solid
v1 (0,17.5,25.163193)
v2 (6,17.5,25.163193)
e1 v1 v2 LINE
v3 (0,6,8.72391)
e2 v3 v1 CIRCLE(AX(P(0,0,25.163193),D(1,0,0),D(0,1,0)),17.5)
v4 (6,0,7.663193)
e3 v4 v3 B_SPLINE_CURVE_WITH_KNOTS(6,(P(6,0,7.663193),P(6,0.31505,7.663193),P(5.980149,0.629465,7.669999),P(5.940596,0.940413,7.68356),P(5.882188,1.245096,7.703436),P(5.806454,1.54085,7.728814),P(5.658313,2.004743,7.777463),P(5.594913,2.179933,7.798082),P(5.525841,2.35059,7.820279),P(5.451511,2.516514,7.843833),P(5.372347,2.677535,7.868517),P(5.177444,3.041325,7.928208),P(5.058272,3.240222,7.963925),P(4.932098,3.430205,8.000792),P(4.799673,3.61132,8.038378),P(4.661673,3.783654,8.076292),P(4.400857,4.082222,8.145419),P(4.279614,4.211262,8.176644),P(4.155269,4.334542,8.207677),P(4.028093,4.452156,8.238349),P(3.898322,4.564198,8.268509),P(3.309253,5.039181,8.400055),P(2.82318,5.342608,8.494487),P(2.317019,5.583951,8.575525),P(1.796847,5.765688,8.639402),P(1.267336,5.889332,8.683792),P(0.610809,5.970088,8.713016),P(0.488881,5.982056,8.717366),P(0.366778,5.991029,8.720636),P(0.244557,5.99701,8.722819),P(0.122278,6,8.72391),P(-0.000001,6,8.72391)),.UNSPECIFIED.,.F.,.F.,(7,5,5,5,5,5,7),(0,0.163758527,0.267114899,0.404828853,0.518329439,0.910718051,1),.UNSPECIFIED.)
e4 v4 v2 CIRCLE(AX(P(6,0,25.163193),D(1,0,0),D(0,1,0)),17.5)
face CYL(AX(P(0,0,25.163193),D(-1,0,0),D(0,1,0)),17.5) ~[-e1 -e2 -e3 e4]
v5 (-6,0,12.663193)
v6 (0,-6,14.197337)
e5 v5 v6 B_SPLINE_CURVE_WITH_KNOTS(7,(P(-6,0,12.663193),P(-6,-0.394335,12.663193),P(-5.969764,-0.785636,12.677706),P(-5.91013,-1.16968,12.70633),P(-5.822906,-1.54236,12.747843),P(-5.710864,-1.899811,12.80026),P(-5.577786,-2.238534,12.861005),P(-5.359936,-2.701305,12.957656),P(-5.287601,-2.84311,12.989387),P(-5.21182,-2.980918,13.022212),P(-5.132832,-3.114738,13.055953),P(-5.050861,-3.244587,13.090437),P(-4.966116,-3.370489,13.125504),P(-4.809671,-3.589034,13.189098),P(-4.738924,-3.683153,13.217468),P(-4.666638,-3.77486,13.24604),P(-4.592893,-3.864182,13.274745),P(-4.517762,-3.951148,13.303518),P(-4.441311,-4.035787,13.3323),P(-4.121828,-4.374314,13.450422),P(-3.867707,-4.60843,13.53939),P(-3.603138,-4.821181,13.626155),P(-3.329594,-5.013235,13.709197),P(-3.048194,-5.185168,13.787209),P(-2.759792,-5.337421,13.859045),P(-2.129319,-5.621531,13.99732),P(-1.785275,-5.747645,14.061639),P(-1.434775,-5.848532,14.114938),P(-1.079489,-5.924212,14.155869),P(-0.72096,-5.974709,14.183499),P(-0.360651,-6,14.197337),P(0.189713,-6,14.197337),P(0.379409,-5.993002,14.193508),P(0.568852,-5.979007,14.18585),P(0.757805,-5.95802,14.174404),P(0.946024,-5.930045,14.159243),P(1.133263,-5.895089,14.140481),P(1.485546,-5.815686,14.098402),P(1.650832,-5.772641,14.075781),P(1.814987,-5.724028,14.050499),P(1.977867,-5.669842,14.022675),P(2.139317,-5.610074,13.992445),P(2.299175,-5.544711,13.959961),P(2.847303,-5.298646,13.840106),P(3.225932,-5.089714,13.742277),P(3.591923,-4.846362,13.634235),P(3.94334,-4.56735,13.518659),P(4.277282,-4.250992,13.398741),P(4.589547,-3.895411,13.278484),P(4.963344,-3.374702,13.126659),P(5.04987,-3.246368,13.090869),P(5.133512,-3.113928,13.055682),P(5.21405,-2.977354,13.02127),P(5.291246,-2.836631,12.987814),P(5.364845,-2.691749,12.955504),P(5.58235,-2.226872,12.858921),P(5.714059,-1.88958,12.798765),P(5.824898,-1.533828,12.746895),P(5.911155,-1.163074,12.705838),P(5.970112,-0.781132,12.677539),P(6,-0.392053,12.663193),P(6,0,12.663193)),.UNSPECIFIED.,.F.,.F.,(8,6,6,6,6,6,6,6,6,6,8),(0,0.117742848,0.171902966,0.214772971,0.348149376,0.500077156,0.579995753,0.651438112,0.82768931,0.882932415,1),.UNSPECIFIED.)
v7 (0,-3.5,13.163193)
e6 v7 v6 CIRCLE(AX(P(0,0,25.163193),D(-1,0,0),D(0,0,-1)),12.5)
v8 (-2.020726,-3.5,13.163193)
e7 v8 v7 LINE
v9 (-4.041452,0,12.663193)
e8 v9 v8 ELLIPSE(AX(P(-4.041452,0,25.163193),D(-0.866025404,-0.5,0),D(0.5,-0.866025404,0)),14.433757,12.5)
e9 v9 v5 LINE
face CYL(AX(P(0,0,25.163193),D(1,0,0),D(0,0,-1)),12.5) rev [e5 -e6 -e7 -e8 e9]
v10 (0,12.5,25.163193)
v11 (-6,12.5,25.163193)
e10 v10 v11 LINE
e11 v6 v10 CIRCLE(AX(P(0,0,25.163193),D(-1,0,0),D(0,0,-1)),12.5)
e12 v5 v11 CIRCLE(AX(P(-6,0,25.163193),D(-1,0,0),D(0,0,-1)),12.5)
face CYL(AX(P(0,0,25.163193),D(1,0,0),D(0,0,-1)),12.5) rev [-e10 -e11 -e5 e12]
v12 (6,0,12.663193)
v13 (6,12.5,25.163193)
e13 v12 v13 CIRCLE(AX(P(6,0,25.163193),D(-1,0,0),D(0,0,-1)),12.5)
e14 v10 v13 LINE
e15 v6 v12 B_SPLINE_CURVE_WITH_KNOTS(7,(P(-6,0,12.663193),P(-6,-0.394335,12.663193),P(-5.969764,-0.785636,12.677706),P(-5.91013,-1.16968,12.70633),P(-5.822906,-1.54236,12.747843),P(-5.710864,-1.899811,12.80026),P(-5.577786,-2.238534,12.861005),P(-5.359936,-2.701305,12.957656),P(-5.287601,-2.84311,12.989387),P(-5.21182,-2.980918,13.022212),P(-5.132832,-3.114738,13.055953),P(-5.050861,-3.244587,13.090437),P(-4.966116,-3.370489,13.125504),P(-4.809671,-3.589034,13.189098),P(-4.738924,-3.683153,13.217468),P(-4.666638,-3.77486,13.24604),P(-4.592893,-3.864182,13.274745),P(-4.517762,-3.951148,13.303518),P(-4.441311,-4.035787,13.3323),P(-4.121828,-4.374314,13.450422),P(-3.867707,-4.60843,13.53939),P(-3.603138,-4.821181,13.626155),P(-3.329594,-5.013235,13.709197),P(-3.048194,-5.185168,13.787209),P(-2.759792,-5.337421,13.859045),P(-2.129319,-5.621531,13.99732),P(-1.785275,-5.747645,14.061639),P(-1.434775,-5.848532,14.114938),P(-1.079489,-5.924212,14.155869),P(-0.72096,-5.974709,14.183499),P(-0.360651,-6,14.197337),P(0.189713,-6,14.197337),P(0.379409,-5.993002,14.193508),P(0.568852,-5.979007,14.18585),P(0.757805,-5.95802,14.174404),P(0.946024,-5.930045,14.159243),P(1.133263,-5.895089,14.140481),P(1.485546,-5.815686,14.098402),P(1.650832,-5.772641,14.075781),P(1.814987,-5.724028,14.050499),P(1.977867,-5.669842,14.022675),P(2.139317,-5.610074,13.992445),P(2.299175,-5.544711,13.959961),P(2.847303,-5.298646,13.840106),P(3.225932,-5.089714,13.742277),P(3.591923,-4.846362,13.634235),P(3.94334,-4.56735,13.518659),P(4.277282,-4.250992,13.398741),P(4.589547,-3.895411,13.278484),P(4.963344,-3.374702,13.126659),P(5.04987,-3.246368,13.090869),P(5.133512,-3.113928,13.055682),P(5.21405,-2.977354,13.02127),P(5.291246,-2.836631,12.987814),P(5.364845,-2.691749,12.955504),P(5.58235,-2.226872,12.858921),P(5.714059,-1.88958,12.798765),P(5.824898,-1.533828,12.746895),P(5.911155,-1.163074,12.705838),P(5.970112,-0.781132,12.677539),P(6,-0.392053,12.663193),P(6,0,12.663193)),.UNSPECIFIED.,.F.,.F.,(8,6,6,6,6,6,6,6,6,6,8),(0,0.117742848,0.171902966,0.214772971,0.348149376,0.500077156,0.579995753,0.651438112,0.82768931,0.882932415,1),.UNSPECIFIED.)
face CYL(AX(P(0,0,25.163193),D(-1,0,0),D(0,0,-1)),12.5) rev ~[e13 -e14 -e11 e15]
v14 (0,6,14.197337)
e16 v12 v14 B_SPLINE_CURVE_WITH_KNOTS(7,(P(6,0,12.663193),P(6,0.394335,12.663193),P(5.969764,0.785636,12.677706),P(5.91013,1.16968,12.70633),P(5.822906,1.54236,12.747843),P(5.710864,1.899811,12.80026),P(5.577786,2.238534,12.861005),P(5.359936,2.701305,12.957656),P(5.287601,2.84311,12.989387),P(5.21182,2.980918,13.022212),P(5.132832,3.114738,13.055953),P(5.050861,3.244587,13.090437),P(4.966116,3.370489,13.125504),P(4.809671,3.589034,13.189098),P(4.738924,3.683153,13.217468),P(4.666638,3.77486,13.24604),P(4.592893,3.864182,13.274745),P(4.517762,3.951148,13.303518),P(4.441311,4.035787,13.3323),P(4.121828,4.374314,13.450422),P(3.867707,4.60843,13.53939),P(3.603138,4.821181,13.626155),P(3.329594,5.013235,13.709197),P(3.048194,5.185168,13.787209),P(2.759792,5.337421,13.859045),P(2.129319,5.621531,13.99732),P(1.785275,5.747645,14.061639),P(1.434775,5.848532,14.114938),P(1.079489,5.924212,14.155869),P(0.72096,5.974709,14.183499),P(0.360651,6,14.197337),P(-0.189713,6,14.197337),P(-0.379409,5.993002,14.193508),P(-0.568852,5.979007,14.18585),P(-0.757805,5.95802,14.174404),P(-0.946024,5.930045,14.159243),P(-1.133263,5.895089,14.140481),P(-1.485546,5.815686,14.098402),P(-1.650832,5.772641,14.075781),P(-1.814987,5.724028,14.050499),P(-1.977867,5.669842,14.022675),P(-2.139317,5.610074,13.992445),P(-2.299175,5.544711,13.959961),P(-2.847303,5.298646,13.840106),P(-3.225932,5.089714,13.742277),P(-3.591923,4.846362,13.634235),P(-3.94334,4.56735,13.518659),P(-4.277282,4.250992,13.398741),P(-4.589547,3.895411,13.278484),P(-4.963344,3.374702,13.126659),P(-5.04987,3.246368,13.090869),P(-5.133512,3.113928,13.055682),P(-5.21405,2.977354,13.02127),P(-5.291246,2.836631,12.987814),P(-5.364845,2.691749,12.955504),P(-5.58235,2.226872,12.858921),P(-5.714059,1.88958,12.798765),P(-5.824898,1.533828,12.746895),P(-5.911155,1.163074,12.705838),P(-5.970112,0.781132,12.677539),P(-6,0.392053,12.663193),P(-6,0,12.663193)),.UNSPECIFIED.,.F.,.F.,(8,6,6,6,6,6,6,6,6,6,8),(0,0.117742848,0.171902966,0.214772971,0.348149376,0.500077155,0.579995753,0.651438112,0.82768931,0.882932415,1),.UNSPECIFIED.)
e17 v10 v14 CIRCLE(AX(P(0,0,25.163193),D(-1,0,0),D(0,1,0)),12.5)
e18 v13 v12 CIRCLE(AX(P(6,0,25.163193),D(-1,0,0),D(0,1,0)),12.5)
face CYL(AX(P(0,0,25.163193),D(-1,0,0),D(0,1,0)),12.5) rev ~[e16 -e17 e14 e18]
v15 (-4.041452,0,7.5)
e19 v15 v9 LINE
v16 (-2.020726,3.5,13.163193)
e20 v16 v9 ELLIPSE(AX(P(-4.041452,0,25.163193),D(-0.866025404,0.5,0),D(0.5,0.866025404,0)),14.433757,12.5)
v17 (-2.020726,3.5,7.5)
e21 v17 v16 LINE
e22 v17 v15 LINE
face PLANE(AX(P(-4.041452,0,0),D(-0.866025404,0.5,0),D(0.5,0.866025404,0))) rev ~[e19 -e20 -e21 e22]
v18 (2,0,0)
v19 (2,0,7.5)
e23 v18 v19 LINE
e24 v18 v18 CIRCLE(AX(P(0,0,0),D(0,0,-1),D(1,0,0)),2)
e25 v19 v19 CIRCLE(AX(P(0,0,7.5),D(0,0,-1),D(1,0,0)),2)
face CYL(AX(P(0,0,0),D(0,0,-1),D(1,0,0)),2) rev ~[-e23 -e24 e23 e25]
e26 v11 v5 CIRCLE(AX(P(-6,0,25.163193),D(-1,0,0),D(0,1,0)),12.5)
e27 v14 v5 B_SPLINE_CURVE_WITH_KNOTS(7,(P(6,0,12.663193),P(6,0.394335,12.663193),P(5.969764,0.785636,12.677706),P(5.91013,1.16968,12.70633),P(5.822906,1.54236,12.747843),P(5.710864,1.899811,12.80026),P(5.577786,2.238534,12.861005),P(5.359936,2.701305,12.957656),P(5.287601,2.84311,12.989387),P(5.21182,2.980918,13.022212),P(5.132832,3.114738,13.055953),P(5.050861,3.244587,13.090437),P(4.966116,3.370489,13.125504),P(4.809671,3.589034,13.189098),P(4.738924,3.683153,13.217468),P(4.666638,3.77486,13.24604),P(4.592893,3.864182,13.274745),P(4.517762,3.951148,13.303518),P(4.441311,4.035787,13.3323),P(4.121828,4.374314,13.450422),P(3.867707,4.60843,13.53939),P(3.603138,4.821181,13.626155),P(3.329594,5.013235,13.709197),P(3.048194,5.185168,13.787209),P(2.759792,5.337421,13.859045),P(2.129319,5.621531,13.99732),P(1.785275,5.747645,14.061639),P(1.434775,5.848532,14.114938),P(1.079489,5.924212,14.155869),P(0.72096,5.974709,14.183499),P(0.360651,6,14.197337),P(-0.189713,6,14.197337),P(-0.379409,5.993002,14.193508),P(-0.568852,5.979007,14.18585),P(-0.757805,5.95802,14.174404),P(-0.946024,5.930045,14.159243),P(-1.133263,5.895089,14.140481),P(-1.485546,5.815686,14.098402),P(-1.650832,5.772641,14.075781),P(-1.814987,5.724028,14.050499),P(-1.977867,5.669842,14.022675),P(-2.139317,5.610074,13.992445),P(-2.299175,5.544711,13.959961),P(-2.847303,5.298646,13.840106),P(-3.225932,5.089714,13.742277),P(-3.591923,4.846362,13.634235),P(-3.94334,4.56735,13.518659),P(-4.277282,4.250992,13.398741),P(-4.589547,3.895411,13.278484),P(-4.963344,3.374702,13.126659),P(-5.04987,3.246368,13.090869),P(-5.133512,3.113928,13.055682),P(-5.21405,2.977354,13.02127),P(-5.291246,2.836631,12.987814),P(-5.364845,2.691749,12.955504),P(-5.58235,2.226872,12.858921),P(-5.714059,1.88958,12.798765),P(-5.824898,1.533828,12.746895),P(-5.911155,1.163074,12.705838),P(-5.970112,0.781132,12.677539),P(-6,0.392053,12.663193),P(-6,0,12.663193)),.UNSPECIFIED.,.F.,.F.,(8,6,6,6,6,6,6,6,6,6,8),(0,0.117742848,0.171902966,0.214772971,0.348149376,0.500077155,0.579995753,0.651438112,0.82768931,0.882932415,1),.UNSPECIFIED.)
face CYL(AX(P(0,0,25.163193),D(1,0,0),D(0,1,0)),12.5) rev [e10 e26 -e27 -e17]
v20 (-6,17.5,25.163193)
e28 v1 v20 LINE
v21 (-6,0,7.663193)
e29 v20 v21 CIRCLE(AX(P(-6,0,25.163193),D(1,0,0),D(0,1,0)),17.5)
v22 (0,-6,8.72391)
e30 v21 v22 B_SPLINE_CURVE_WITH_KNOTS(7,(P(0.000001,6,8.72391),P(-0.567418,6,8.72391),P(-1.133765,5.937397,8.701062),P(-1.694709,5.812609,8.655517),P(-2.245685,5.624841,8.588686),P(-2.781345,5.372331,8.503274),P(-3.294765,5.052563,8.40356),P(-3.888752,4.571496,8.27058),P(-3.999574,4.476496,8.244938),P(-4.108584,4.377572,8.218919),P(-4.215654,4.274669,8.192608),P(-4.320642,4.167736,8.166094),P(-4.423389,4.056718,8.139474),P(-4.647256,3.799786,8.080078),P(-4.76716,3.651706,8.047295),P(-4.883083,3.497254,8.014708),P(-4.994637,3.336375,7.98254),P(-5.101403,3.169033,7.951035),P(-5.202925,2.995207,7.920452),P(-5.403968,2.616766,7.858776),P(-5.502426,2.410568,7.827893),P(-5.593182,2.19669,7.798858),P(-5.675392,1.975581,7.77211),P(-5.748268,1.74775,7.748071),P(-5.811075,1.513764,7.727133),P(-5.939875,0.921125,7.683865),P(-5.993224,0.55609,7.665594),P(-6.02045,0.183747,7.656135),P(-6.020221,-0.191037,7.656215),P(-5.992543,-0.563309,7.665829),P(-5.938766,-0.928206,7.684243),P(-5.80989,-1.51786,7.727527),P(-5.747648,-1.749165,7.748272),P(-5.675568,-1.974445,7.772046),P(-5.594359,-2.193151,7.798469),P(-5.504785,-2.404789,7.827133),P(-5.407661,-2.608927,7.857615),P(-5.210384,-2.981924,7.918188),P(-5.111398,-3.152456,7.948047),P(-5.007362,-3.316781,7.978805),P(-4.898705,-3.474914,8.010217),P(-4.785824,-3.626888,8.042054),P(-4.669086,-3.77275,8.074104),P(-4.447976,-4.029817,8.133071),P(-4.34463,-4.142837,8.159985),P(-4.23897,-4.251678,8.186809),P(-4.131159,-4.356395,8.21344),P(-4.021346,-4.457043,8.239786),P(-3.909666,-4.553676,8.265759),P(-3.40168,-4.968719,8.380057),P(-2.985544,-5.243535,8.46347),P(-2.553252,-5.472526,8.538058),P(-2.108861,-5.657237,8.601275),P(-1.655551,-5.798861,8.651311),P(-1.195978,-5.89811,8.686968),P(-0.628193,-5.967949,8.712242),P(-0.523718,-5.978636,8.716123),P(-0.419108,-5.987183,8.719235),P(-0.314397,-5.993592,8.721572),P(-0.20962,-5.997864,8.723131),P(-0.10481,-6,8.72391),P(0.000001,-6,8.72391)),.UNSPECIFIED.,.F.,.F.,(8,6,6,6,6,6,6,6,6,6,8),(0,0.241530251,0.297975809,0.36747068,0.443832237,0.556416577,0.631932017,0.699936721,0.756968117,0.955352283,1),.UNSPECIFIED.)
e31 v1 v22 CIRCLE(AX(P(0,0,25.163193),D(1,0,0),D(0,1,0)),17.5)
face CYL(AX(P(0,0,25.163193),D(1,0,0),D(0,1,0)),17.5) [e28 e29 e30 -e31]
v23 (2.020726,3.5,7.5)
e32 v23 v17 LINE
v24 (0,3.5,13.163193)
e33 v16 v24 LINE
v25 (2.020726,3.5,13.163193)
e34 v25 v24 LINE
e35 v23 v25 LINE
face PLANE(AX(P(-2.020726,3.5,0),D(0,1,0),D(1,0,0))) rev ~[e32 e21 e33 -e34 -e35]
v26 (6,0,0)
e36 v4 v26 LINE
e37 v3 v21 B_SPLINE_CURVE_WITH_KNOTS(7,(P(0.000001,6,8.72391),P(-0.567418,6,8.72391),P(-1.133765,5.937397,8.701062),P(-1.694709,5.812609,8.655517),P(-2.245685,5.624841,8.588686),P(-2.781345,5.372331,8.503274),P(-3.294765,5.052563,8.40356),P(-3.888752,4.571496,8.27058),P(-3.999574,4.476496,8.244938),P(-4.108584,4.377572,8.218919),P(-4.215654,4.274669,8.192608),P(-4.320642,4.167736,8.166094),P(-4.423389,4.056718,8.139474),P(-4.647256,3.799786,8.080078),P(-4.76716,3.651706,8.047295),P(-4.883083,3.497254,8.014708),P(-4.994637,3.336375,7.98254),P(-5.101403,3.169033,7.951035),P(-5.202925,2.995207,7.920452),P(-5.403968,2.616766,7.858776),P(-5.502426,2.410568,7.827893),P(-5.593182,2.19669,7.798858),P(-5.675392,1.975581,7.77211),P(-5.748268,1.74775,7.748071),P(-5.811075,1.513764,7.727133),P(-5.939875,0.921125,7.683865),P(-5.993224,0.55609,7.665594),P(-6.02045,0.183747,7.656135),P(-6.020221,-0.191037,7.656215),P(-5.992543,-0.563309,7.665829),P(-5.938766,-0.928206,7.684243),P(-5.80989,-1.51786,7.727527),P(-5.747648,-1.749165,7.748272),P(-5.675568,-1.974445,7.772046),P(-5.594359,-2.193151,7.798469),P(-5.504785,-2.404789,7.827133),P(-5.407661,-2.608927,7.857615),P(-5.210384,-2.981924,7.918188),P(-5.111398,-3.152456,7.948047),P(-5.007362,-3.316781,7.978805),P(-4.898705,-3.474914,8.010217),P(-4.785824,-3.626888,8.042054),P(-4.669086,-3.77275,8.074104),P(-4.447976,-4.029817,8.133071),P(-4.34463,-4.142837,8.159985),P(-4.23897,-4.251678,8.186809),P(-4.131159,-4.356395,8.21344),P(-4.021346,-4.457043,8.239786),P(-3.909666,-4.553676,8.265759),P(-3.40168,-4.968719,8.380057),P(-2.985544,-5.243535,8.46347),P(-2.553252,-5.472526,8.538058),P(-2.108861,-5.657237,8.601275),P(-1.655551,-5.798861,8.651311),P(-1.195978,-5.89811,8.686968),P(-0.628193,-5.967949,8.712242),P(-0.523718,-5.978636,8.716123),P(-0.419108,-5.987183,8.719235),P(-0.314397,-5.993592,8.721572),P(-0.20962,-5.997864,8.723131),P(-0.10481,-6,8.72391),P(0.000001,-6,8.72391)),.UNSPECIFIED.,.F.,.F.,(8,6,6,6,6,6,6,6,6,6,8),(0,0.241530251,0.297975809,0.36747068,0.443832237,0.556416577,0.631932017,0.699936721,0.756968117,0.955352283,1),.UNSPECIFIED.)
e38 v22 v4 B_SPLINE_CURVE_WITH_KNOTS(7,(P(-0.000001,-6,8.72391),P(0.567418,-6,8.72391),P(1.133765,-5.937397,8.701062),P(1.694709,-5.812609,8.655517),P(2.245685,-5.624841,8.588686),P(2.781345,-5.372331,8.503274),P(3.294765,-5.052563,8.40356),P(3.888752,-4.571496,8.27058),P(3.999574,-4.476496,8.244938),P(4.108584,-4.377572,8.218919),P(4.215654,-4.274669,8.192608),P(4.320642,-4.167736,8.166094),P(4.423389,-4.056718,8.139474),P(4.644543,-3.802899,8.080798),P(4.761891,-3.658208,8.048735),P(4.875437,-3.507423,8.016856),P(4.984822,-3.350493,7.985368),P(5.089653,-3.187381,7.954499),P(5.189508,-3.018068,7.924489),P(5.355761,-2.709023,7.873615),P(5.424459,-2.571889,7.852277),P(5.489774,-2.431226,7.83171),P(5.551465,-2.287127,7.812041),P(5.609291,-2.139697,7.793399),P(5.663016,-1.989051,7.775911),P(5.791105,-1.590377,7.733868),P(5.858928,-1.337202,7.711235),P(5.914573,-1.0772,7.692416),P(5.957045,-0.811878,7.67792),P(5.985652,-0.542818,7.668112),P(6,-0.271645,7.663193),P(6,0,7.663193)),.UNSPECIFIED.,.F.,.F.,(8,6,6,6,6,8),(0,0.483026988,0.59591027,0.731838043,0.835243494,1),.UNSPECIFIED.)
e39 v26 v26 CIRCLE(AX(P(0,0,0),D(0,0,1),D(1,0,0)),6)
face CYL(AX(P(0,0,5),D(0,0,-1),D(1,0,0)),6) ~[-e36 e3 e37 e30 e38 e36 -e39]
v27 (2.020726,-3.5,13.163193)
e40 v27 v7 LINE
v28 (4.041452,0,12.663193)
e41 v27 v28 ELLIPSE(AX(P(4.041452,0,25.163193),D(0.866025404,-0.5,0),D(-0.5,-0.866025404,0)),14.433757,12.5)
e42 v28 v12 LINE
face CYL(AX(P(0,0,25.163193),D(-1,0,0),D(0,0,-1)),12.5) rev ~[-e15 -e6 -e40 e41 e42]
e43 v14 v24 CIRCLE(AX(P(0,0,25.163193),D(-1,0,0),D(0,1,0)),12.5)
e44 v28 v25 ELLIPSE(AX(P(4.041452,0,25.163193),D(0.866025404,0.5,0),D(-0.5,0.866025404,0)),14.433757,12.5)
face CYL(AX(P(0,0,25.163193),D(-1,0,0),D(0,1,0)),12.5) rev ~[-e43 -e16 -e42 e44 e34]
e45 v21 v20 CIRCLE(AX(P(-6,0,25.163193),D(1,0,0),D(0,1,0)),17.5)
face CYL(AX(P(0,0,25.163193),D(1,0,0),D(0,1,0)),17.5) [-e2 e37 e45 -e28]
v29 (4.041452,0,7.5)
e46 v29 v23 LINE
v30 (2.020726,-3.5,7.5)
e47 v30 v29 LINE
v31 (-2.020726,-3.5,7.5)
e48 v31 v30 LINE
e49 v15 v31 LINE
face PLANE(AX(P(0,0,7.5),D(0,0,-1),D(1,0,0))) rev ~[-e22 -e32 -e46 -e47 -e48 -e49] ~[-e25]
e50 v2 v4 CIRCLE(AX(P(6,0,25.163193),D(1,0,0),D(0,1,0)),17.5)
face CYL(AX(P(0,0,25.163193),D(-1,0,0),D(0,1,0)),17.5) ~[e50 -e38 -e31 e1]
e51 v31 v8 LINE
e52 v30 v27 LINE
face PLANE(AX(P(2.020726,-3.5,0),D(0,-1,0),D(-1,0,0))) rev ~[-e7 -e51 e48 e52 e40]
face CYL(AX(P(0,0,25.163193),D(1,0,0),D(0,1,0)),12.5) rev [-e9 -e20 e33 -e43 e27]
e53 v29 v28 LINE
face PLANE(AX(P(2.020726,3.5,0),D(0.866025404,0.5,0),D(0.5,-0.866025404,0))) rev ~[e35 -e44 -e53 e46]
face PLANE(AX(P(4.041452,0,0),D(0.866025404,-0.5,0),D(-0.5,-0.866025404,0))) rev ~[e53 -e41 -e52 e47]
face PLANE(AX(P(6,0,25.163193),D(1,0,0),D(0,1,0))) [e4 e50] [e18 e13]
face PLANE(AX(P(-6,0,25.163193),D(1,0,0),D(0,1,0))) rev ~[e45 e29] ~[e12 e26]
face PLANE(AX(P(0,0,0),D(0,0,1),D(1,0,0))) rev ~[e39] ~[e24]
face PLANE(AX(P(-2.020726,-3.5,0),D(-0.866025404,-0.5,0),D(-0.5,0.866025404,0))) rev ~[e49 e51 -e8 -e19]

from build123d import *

# Parameters (mm, degrees)
F0_R          = 6
F0_R_2        = 2
F1_DEPTH      = 5
F2_R          = 6
F3_DEPTH      = 5
F4_R          = 17.5
F5_DEPTH      = 6
F5_DEPTH_BACK = 6
F7_END_RADIUS = 12.5
F6_R          = 6
F7_REACH      = 59.6347554857
F9_DEPTH      = 25
F10_R         = 6
F10_R_2       = 2
F11_DEPTH     = 7.5


with BuildPart() as f1:
    # F0 (on Top) → F1 (new body)
    with BuildSketch(Plane.XY):
        Circle(F0_R)
        Polygon((-4.0414518843, 0), (-2.0207259422, 3.5), (2.0207259422, 3.5), (4.0414518843, 0), (2.0207259422, -3.5), (-2.0207259422, -3.5), align=None, mode=Mode.SUBTRACT)
        Polygon((2.0207259422, 3.5), (-2.0207259422, 3.5), (-4.0414518843, 0), (-2.0207259422, -3.5), (2.0207259422, -3.5), (4.0414518843, 0), align=None)
        Circle(F0_R_2, mode=Mode.SUBTRACT)
    extrude(amount=F1_DEPTH)

    # F2 (on face) → F3 (join)
    with BuildSketch(Plane.XY.offset(5)):
        Circle(F2_R)
        Polygon((-2.5149954402, 3.1635630654), (1.482228261, 3.7598314744), (3.9972237013, 0.5962684089), (2.5149954402, -3.1635630654), (-1.482228261, -3.7598314744), (-3.9972237013, -0.5962684089), align=None, mode=Mode.SUBTRACT)
    extrude(amount=F3_DEPTH)

    # F4 (on Right) → F5 (join, two sides)
    with BuildSketch(Plane.YZ) as f5_sk:
        with Locations((0, 25.1631926373)):
            Circle(F4_R)
        with BuildLine():
            ThreePointArc((0, 12.6631926373), (-8.8388347648, 34.0020274021), (12.5, 25.1631926373))
            ThreePointArc((12.5, 25.1631926373), (8.8388347648, 16.3243578724), (0, 12.6631926373))
        make_face(mode=Mode.SUBTRACT)
    extrude(amount=-F5_DEPTH)
    extrude(f5_sk.sketch, amount=F5_DEPTH_BACK)

    f7_end = (Plane(origin=(3, 0, 25.1631926373), x_dir=(0, 0, -1), z_dir=(-1, 0, 0)) * Cylinder(F7_END_RADIUS, 232.2145957139, mode=Mode.PRIVATE)).faces().sort_by_distance((3, -12.5, 25.1631926373))[0]
    # F6 (on Top) → F7 (join, up to the whole of a round face its end follows)
    with BuildSketch(Plane.XY):
        Circle(F6_R)
    f7_long = extrude(amount=F7_REACH, mode=Mode.PRIVATE)
    add(split(f7_long, bisect_by=f7_end, keep=Keep.ALL, mode=Mode.PRIVATE).solids().sort_by_distance((0, 0, 0))[0])

    # F8 (on face) → F9 (cut)
    with BuildSketch(Plane(origin=(0, 0, 0), x_dir=(1, 0, 0), z_dir=(0, 0, -1))):
        Polygon((2.0207259422, 3.5), (-2.0207259422, 3.5), (-4.0414518843, 0), (-2.0207259422, -3.5), (2.0207259422, -3.5), (4.0414518843, 0), align=None)
    extrude(amount=-F9_DEPTH, mode=Mode.SUBTRACT)

    # F10 (on face) → F11 (join)
    with BuildSketch(Plane(origin=(0, 0, 0), x_dir=(1, 0, 0), z_dir=(0, 0, -1))):
        Circle(F10_R)
        Circle(F10_R_2, mode=Mode.SUBTRACT)
    extrude(amount=-F11_DEPTH)


solid = f1.part
